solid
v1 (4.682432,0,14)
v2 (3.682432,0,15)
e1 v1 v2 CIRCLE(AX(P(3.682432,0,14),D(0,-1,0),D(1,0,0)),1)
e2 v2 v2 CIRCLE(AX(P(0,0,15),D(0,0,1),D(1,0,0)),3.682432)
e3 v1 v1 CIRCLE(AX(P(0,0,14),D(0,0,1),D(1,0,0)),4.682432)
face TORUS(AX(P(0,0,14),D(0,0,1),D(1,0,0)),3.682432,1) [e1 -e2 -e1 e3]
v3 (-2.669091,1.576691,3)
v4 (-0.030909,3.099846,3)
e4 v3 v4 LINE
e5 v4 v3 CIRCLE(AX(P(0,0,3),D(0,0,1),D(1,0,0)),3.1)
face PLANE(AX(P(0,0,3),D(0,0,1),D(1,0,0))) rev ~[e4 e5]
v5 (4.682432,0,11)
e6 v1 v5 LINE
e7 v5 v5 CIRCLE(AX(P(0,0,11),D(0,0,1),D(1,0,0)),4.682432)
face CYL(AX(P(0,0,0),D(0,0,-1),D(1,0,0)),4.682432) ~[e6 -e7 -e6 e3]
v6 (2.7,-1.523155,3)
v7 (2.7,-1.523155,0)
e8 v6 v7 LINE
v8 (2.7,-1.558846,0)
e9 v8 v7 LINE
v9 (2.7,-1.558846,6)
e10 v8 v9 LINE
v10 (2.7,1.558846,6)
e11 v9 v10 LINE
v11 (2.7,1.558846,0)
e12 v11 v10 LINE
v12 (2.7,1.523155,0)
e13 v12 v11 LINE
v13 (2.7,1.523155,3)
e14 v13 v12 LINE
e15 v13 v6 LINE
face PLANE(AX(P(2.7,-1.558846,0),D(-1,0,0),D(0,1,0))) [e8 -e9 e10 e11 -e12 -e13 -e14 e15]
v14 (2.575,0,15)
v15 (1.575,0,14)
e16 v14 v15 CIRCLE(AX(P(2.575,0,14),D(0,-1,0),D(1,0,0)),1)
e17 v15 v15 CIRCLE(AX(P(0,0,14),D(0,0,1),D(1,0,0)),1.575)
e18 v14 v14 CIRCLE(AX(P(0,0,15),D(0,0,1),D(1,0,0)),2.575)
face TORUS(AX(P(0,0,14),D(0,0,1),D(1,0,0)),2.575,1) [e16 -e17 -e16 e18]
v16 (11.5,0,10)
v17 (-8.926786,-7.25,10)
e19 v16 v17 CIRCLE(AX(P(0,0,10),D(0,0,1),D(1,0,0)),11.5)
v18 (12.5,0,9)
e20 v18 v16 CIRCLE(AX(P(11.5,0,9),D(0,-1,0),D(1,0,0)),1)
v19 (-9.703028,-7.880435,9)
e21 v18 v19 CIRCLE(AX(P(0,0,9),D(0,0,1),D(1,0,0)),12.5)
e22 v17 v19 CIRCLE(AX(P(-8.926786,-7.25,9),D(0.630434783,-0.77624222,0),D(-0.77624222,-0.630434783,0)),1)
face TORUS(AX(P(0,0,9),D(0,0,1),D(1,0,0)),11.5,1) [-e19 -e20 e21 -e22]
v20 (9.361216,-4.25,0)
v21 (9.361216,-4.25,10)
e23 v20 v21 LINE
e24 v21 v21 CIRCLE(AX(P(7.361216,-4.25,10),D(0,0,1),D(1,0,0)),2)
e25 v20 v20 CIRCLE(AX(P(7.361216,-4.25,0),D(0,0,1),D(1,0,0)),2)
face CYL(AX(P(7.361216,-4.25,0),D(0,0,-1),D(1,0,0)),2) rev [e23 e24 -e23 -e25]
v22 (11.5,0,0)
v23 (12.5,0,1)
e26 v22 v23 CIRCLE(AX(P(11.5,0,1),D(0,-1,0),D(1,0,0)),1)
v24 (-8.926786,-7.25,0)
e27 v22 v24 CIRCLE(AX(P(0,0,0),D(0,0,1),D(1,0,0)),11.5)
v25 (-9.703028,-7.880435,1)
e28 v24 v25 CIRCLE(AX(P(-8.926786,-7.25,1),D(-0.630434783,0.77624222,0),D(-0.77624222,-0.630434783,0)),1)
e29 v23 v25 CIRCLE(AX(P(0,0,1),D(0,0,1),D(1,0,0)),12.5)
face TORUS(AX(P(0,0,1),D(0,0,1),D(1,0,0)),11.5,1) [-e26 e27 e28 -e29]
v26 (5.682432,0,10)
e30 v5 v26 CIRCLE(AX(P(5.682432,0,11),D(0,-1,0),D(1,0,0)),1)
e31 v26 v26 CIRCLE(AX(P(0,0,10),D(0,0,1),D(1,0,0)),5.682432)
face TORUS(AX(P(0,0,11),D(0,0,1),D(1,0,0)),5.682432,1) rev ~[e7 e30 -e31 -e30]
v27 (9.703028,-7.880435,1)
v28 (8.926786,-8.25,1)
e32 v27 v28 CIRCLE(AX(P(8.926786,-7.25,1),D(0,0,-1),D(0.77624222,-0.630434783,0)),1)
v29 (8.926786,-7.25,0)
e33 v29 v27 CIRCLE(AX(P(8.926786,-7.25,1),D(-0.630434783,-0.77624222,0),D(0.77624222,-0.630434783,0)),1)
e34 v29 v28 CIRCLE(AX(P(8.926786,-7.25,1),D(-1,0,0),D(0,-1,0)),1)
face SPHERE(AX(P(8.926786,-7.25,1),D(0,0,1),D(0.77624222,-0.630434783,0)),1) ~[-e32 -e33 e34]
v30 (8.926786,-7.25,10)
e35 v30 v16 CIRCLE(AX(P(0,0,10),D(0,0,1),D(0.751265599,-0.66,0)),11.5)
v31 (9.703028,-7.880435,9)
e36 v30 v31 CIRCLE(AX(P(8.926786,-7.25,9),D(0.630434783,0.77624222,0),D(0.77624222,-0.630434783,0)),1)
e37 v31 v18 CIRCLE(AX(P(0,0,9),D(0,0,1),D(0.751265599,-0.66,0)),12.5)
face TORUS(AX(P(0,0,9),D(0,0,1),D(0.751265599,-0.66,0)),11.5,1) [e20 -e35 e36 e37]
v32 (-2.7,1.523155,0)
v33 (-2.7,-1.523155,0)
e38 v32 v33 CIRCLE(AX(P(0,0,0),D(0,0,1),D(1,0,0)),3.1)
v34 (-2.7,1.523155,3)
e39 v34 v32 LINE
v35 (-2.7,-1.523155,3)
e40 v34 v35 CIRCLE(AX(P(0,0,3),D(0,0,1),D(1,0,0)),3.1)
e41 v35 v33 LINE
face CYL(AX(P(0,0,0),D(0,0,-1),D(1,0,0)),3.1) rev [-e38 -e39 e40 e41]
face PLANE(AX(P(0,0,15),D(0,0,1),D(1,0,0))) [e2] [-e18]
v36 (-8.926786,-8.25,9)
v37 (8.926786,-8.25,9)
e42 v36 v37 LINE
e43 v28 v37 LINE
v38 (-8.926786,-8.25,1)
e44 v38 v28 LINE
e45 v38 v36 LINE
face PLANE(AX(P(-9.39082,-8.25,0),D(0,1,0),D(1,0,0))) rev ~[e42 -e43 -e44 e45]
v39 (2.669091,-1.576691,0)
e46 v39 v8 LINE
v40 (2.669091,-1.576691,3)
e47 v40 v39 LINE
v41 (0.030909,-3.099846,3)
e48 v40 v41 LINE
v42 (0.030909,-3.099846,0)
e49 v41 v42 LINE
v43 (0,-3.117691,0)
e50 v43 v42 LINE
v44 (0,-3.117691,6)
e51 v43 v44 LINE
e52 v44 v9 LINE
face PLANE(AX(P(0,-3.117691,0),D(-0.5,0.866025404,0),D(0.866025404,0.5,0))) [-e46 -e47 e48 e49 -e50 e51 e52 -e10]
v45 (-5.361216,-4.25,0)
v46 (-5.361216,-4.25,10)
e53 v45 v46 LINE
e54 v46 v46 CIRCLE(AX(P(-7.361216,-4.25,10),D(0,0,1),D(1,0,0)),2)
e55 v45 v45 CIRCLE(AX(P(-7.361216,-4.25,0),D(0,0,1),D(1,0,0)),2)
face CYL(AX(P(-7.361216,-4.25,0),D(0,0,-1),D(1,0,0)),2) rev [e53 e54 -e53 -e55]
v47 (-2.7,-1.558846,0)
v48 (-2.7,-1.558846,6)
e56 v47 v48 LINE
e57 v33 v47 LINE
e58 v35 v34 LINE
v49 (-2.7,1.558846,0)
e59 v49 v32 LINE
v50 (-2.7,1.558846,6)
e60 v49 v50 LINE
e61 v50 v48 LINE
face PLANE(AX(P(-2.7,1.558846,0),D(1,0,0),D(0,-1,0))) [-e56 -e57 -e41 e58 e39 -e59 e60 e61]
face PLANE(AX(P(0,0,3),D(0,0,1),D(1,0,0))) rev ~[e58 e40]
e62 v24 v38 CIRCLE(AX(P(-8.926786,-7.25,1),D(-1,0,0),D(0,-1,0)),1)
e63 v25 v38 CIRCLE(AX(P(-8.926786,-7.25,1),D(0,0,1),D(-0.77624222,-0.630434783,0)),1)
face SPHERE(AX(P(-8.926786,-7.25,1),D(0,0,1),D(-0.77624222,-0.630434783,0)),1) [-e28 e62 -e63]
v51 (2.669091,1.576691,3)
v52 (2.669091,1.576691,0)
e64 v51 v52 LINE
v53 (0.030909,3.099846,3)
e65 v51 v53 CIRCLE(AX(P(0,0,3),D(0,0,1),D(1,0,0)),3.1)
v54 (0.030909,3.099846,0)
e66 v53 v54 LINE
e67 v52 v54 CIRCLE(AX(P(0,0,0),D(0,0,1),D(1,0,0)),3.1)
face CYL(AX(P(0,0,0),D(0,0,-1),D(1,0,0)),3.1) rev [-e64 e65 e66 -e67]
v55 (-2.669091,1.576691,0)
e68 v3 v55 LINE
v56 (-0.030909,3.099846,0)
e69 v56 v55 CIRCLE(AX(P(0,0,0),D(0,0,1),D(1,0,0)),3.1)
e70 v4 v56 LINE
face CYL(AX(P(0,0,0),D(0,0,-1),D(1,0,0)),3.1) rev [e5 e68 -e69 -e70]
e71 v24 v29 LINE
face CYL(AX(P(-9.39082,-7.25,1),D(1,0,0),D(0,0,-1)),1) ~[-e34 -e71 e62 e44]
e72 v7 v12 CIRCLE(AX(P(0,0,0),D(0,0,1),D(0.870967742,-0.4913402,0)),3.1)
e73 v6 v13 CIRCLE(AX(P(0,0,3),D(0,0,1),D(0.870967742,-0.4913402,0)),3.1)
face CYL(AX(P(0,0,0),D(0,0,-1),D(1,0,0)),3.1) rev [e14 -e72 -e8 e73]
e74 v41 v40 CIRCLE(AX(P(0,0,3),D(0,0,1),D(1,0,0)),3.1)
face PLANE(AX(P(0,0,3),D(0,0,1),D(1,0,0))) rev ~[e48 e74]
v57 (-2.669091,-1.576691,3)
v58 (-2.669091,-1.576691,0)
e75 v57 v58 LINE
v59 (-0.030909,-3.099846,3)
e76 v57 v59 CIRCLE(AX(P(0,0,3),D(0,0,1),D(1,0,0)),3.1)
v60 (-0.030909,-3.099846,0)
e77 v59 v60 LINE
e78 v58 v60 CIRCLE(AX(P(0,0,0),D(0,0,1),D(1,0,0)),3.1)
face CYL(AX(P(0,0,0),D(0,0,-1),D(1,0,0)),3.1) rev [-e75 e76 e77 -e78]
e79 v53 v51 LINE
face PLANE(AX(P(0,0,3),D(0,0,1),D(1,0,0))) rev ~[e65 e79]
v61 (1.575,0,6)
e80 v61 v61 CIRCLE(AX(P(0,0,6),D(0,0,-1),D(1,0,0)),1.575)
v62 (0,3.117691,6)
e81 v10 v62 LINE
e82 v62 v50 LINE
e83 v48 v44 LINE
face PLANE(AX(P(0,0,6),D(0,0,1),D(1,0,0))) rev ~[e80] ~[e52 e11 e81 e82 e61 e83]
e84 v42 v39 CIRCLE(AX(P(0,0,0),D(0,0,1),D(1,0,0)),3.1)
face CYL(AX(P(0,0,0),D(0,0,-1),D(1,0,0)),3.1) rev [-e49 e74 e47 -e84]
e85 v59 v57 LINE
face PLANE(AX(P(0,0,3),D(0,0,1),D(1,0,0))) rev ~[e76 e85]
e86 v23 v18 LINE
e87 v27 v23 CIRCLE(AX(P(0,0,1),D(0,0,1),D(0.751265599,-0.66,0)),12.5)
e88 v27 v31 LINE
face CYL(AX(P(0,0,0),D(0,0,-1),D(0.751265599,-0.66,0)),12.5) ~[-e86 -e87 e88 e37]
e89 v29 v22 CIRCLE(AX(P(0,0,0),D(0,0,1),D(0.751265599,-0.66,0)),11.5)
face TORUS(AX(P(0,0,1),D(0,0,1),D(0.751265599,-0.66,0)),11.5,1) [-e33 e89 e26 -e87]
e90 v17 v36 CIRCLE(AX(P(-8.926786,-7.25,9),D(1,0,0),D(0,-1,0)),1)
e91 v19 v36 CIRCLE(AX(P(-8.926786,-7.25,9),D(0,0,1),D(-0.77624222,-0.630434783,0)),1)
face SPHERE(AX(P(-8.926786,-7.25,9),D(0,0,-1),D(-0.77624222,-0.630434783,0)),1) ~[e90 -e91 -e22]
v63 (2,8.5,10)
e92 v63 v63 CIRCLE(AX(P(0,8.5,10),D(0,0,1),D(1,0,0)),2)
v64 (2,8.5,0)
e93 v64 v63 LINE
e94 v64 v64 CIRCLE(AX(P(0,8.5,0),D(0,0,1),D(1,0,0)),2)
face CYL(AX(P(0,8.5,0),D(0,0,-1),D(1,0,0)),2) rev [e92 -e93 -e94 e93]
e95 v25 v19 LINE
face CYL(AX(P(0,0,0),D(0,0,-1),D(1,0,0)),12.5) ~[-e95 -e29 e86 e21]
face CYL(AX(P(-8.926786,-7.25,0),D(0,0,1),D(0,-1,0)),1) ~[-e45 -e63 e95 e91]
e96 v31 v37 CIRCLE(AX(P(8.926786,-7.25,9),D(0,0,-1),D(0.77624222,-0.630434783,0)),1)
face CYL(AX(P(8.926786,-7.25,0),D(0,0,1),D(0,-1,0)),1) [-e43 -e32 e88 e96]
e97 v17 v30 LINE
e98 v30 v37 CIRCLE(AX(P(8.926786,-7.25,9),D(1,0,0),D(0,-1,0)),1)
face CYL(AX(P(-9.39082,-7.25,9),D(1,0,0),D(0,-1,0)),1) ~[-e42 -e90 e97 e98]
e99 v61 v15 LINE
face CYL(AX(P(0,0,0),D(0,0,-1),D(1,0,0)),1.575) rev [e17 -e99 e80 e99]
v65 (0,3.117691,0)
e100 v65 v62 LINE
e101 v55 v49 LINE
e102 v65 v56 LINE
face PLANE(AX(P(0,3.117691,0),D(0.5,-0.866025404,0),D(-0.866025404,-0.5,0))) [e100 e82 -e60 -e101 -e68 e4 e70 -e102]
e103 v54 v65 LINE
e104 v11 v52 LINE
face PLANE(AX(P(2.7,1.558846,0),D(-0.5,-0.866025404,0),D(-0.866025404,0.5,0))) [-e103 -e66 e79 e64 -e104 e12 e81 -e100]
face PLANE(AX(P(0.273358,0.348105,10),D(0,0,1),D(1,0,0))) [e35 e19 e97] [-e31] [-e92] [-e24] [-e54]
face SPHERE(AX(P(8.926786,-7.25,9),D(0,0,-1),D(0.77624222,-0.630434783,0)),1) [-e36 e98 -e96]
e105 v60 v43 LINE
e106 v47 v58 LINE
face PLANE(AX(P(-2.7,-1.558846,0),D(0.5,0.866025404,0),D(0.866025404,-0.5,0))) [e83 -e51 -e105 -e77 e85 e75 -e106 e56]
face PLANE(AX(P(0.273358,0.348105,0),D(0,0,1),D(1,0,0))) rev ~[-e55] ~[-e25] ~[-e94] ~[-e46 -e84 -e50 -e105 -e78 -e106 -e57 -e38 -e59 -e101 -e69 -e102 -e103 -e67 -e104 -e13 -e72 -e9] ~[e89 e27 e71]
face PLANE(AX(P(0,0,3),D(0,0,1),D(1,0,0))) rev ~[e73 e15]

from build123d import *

# Parameters (mm, degrees)
F0_R        = 2
F0_R_2      = 4.682431568
F1_DEPTH    = 10
F0_R_3      = 3.1
F0_R_4      = 1.575
F2_DEPTH    = 15
F1_FACE_R   = 2
F1_FACE_R_2 = 4.682431568
F3_DEPTH    = 3
F5_DEPTH    = 6
F6_R        = 1


with BuildPart() as f1:
    # F0 (on Top) → F1 (new body)
    with BuildSketch(Plane.XY):
        with BuildLine():
            ThreePointArc((9.3908199855, -8.25), (11.6969066385, -4.4082167699), (12.5, 0))
            ThreePointArc((12.5, 0), (-4.4082167699, 11.6969066385), (-9.3908199855, -8.25))
            Line((-9.3908199855, -8.25), (9.3908199855, -8.25))
        make_face()
        with Locations((-7.3612159322, -4.25)):
            Circle(F0_R, mode=Mode.SUBTRACT)
        with Locations((7.3612159322, -4.25)):
            Circle(F0_R, mode=Mode.SUBTRACT)
        Circle(F0_R_2, mode=Mode.SUBTRACT)
        with Locations((0, 8.5)):
            Circle(F0_R, mode=Mode.SUBTRACT)
    extrude(amount=F1_DEPTH)

    # F0 (on Top) → F2 (join)
    with BuildSketch(Plane.XY):
        Circle(F0_R_2)
        Circle(F0_R_3, mode=Mode.SUBTRACT)
        Circle(F0_R_3)
        Circle(F0_R_4, mode=Mode.SUBTRACT)
    extrude(amount=F2_DEPTH)

    # F1_face (on face) + F0 (on Top) → F3 (cut)
    with BuildSketch(Plane(origin=(0, 1.6783251384, 10), x_dir=(1, 0, 0), z_dir=(0, 0, 1))):
        with BuildLine():
            ThreePointArc((9.3908199855, -9.9283251384), (0, 10.8216748616), (-9.3908199855, -9.9283251384))
            Line((-9.3908199855, -9.9283251384), (9.3908199855, -9.9283251384))
        make_face()
        with Locations((-7.3612159322, -5.9283251384)):
            Circle(F1_FACE_R, mode=Mode.SUBTRACT)
        with Locations((7.3612159322, -5.9283251384)):
            Circle(F1_FACE_R, mode=Mode.SUBTRACT)
        with Locations((0, -1.6783251384)):
            Circle(F1_FACE_R_2, mode=Mode.SUBTRACT)
        with Locations((0, 6.8216748616)):
            Circle(F1_FACE_R, mode=Mode.SUBTRACT)
    with BuildSketch(Plane.XY):
        Circle(F0_R_3)
        Circle(F0_R_4, mode=Mode.SUBTRACT)
    extrude(amount=F3_DEPTH, mode=Mode.SUBTRACT)

    # F4 (on Top) → F5 (cut)
    with BuildSketch(Plane.XY):
        Polygon((2.7, -1.5588457268), (2.7, 1.5588457268), (0, 3.1176914536), (-2.7, 1.5588457268), (-2.7, -1.5588457268), (0, -3.1176914536), align=None)
    extrude(amount=F5_DEPTH, mode=Mode.SUBTRACT)

    # F6
    f6_edges = [f1.edges().sort_by_distance(p)[0] for p in [
        (-1.575, 0, 15),
        (-4.682432, 0, 15),
        (-4.682432, 0, 10),
        (0, 12.5, 10),
        (0, -8.25, 10),
        (0, 12.5, 0),
        (0, -8.25, 0),
        (9.39082, -8.25, 5),
        (-9.39082, -8.25, 5),
    ]]
    fillet(f6_edges, radius=F6_R)


solid = f1.part
